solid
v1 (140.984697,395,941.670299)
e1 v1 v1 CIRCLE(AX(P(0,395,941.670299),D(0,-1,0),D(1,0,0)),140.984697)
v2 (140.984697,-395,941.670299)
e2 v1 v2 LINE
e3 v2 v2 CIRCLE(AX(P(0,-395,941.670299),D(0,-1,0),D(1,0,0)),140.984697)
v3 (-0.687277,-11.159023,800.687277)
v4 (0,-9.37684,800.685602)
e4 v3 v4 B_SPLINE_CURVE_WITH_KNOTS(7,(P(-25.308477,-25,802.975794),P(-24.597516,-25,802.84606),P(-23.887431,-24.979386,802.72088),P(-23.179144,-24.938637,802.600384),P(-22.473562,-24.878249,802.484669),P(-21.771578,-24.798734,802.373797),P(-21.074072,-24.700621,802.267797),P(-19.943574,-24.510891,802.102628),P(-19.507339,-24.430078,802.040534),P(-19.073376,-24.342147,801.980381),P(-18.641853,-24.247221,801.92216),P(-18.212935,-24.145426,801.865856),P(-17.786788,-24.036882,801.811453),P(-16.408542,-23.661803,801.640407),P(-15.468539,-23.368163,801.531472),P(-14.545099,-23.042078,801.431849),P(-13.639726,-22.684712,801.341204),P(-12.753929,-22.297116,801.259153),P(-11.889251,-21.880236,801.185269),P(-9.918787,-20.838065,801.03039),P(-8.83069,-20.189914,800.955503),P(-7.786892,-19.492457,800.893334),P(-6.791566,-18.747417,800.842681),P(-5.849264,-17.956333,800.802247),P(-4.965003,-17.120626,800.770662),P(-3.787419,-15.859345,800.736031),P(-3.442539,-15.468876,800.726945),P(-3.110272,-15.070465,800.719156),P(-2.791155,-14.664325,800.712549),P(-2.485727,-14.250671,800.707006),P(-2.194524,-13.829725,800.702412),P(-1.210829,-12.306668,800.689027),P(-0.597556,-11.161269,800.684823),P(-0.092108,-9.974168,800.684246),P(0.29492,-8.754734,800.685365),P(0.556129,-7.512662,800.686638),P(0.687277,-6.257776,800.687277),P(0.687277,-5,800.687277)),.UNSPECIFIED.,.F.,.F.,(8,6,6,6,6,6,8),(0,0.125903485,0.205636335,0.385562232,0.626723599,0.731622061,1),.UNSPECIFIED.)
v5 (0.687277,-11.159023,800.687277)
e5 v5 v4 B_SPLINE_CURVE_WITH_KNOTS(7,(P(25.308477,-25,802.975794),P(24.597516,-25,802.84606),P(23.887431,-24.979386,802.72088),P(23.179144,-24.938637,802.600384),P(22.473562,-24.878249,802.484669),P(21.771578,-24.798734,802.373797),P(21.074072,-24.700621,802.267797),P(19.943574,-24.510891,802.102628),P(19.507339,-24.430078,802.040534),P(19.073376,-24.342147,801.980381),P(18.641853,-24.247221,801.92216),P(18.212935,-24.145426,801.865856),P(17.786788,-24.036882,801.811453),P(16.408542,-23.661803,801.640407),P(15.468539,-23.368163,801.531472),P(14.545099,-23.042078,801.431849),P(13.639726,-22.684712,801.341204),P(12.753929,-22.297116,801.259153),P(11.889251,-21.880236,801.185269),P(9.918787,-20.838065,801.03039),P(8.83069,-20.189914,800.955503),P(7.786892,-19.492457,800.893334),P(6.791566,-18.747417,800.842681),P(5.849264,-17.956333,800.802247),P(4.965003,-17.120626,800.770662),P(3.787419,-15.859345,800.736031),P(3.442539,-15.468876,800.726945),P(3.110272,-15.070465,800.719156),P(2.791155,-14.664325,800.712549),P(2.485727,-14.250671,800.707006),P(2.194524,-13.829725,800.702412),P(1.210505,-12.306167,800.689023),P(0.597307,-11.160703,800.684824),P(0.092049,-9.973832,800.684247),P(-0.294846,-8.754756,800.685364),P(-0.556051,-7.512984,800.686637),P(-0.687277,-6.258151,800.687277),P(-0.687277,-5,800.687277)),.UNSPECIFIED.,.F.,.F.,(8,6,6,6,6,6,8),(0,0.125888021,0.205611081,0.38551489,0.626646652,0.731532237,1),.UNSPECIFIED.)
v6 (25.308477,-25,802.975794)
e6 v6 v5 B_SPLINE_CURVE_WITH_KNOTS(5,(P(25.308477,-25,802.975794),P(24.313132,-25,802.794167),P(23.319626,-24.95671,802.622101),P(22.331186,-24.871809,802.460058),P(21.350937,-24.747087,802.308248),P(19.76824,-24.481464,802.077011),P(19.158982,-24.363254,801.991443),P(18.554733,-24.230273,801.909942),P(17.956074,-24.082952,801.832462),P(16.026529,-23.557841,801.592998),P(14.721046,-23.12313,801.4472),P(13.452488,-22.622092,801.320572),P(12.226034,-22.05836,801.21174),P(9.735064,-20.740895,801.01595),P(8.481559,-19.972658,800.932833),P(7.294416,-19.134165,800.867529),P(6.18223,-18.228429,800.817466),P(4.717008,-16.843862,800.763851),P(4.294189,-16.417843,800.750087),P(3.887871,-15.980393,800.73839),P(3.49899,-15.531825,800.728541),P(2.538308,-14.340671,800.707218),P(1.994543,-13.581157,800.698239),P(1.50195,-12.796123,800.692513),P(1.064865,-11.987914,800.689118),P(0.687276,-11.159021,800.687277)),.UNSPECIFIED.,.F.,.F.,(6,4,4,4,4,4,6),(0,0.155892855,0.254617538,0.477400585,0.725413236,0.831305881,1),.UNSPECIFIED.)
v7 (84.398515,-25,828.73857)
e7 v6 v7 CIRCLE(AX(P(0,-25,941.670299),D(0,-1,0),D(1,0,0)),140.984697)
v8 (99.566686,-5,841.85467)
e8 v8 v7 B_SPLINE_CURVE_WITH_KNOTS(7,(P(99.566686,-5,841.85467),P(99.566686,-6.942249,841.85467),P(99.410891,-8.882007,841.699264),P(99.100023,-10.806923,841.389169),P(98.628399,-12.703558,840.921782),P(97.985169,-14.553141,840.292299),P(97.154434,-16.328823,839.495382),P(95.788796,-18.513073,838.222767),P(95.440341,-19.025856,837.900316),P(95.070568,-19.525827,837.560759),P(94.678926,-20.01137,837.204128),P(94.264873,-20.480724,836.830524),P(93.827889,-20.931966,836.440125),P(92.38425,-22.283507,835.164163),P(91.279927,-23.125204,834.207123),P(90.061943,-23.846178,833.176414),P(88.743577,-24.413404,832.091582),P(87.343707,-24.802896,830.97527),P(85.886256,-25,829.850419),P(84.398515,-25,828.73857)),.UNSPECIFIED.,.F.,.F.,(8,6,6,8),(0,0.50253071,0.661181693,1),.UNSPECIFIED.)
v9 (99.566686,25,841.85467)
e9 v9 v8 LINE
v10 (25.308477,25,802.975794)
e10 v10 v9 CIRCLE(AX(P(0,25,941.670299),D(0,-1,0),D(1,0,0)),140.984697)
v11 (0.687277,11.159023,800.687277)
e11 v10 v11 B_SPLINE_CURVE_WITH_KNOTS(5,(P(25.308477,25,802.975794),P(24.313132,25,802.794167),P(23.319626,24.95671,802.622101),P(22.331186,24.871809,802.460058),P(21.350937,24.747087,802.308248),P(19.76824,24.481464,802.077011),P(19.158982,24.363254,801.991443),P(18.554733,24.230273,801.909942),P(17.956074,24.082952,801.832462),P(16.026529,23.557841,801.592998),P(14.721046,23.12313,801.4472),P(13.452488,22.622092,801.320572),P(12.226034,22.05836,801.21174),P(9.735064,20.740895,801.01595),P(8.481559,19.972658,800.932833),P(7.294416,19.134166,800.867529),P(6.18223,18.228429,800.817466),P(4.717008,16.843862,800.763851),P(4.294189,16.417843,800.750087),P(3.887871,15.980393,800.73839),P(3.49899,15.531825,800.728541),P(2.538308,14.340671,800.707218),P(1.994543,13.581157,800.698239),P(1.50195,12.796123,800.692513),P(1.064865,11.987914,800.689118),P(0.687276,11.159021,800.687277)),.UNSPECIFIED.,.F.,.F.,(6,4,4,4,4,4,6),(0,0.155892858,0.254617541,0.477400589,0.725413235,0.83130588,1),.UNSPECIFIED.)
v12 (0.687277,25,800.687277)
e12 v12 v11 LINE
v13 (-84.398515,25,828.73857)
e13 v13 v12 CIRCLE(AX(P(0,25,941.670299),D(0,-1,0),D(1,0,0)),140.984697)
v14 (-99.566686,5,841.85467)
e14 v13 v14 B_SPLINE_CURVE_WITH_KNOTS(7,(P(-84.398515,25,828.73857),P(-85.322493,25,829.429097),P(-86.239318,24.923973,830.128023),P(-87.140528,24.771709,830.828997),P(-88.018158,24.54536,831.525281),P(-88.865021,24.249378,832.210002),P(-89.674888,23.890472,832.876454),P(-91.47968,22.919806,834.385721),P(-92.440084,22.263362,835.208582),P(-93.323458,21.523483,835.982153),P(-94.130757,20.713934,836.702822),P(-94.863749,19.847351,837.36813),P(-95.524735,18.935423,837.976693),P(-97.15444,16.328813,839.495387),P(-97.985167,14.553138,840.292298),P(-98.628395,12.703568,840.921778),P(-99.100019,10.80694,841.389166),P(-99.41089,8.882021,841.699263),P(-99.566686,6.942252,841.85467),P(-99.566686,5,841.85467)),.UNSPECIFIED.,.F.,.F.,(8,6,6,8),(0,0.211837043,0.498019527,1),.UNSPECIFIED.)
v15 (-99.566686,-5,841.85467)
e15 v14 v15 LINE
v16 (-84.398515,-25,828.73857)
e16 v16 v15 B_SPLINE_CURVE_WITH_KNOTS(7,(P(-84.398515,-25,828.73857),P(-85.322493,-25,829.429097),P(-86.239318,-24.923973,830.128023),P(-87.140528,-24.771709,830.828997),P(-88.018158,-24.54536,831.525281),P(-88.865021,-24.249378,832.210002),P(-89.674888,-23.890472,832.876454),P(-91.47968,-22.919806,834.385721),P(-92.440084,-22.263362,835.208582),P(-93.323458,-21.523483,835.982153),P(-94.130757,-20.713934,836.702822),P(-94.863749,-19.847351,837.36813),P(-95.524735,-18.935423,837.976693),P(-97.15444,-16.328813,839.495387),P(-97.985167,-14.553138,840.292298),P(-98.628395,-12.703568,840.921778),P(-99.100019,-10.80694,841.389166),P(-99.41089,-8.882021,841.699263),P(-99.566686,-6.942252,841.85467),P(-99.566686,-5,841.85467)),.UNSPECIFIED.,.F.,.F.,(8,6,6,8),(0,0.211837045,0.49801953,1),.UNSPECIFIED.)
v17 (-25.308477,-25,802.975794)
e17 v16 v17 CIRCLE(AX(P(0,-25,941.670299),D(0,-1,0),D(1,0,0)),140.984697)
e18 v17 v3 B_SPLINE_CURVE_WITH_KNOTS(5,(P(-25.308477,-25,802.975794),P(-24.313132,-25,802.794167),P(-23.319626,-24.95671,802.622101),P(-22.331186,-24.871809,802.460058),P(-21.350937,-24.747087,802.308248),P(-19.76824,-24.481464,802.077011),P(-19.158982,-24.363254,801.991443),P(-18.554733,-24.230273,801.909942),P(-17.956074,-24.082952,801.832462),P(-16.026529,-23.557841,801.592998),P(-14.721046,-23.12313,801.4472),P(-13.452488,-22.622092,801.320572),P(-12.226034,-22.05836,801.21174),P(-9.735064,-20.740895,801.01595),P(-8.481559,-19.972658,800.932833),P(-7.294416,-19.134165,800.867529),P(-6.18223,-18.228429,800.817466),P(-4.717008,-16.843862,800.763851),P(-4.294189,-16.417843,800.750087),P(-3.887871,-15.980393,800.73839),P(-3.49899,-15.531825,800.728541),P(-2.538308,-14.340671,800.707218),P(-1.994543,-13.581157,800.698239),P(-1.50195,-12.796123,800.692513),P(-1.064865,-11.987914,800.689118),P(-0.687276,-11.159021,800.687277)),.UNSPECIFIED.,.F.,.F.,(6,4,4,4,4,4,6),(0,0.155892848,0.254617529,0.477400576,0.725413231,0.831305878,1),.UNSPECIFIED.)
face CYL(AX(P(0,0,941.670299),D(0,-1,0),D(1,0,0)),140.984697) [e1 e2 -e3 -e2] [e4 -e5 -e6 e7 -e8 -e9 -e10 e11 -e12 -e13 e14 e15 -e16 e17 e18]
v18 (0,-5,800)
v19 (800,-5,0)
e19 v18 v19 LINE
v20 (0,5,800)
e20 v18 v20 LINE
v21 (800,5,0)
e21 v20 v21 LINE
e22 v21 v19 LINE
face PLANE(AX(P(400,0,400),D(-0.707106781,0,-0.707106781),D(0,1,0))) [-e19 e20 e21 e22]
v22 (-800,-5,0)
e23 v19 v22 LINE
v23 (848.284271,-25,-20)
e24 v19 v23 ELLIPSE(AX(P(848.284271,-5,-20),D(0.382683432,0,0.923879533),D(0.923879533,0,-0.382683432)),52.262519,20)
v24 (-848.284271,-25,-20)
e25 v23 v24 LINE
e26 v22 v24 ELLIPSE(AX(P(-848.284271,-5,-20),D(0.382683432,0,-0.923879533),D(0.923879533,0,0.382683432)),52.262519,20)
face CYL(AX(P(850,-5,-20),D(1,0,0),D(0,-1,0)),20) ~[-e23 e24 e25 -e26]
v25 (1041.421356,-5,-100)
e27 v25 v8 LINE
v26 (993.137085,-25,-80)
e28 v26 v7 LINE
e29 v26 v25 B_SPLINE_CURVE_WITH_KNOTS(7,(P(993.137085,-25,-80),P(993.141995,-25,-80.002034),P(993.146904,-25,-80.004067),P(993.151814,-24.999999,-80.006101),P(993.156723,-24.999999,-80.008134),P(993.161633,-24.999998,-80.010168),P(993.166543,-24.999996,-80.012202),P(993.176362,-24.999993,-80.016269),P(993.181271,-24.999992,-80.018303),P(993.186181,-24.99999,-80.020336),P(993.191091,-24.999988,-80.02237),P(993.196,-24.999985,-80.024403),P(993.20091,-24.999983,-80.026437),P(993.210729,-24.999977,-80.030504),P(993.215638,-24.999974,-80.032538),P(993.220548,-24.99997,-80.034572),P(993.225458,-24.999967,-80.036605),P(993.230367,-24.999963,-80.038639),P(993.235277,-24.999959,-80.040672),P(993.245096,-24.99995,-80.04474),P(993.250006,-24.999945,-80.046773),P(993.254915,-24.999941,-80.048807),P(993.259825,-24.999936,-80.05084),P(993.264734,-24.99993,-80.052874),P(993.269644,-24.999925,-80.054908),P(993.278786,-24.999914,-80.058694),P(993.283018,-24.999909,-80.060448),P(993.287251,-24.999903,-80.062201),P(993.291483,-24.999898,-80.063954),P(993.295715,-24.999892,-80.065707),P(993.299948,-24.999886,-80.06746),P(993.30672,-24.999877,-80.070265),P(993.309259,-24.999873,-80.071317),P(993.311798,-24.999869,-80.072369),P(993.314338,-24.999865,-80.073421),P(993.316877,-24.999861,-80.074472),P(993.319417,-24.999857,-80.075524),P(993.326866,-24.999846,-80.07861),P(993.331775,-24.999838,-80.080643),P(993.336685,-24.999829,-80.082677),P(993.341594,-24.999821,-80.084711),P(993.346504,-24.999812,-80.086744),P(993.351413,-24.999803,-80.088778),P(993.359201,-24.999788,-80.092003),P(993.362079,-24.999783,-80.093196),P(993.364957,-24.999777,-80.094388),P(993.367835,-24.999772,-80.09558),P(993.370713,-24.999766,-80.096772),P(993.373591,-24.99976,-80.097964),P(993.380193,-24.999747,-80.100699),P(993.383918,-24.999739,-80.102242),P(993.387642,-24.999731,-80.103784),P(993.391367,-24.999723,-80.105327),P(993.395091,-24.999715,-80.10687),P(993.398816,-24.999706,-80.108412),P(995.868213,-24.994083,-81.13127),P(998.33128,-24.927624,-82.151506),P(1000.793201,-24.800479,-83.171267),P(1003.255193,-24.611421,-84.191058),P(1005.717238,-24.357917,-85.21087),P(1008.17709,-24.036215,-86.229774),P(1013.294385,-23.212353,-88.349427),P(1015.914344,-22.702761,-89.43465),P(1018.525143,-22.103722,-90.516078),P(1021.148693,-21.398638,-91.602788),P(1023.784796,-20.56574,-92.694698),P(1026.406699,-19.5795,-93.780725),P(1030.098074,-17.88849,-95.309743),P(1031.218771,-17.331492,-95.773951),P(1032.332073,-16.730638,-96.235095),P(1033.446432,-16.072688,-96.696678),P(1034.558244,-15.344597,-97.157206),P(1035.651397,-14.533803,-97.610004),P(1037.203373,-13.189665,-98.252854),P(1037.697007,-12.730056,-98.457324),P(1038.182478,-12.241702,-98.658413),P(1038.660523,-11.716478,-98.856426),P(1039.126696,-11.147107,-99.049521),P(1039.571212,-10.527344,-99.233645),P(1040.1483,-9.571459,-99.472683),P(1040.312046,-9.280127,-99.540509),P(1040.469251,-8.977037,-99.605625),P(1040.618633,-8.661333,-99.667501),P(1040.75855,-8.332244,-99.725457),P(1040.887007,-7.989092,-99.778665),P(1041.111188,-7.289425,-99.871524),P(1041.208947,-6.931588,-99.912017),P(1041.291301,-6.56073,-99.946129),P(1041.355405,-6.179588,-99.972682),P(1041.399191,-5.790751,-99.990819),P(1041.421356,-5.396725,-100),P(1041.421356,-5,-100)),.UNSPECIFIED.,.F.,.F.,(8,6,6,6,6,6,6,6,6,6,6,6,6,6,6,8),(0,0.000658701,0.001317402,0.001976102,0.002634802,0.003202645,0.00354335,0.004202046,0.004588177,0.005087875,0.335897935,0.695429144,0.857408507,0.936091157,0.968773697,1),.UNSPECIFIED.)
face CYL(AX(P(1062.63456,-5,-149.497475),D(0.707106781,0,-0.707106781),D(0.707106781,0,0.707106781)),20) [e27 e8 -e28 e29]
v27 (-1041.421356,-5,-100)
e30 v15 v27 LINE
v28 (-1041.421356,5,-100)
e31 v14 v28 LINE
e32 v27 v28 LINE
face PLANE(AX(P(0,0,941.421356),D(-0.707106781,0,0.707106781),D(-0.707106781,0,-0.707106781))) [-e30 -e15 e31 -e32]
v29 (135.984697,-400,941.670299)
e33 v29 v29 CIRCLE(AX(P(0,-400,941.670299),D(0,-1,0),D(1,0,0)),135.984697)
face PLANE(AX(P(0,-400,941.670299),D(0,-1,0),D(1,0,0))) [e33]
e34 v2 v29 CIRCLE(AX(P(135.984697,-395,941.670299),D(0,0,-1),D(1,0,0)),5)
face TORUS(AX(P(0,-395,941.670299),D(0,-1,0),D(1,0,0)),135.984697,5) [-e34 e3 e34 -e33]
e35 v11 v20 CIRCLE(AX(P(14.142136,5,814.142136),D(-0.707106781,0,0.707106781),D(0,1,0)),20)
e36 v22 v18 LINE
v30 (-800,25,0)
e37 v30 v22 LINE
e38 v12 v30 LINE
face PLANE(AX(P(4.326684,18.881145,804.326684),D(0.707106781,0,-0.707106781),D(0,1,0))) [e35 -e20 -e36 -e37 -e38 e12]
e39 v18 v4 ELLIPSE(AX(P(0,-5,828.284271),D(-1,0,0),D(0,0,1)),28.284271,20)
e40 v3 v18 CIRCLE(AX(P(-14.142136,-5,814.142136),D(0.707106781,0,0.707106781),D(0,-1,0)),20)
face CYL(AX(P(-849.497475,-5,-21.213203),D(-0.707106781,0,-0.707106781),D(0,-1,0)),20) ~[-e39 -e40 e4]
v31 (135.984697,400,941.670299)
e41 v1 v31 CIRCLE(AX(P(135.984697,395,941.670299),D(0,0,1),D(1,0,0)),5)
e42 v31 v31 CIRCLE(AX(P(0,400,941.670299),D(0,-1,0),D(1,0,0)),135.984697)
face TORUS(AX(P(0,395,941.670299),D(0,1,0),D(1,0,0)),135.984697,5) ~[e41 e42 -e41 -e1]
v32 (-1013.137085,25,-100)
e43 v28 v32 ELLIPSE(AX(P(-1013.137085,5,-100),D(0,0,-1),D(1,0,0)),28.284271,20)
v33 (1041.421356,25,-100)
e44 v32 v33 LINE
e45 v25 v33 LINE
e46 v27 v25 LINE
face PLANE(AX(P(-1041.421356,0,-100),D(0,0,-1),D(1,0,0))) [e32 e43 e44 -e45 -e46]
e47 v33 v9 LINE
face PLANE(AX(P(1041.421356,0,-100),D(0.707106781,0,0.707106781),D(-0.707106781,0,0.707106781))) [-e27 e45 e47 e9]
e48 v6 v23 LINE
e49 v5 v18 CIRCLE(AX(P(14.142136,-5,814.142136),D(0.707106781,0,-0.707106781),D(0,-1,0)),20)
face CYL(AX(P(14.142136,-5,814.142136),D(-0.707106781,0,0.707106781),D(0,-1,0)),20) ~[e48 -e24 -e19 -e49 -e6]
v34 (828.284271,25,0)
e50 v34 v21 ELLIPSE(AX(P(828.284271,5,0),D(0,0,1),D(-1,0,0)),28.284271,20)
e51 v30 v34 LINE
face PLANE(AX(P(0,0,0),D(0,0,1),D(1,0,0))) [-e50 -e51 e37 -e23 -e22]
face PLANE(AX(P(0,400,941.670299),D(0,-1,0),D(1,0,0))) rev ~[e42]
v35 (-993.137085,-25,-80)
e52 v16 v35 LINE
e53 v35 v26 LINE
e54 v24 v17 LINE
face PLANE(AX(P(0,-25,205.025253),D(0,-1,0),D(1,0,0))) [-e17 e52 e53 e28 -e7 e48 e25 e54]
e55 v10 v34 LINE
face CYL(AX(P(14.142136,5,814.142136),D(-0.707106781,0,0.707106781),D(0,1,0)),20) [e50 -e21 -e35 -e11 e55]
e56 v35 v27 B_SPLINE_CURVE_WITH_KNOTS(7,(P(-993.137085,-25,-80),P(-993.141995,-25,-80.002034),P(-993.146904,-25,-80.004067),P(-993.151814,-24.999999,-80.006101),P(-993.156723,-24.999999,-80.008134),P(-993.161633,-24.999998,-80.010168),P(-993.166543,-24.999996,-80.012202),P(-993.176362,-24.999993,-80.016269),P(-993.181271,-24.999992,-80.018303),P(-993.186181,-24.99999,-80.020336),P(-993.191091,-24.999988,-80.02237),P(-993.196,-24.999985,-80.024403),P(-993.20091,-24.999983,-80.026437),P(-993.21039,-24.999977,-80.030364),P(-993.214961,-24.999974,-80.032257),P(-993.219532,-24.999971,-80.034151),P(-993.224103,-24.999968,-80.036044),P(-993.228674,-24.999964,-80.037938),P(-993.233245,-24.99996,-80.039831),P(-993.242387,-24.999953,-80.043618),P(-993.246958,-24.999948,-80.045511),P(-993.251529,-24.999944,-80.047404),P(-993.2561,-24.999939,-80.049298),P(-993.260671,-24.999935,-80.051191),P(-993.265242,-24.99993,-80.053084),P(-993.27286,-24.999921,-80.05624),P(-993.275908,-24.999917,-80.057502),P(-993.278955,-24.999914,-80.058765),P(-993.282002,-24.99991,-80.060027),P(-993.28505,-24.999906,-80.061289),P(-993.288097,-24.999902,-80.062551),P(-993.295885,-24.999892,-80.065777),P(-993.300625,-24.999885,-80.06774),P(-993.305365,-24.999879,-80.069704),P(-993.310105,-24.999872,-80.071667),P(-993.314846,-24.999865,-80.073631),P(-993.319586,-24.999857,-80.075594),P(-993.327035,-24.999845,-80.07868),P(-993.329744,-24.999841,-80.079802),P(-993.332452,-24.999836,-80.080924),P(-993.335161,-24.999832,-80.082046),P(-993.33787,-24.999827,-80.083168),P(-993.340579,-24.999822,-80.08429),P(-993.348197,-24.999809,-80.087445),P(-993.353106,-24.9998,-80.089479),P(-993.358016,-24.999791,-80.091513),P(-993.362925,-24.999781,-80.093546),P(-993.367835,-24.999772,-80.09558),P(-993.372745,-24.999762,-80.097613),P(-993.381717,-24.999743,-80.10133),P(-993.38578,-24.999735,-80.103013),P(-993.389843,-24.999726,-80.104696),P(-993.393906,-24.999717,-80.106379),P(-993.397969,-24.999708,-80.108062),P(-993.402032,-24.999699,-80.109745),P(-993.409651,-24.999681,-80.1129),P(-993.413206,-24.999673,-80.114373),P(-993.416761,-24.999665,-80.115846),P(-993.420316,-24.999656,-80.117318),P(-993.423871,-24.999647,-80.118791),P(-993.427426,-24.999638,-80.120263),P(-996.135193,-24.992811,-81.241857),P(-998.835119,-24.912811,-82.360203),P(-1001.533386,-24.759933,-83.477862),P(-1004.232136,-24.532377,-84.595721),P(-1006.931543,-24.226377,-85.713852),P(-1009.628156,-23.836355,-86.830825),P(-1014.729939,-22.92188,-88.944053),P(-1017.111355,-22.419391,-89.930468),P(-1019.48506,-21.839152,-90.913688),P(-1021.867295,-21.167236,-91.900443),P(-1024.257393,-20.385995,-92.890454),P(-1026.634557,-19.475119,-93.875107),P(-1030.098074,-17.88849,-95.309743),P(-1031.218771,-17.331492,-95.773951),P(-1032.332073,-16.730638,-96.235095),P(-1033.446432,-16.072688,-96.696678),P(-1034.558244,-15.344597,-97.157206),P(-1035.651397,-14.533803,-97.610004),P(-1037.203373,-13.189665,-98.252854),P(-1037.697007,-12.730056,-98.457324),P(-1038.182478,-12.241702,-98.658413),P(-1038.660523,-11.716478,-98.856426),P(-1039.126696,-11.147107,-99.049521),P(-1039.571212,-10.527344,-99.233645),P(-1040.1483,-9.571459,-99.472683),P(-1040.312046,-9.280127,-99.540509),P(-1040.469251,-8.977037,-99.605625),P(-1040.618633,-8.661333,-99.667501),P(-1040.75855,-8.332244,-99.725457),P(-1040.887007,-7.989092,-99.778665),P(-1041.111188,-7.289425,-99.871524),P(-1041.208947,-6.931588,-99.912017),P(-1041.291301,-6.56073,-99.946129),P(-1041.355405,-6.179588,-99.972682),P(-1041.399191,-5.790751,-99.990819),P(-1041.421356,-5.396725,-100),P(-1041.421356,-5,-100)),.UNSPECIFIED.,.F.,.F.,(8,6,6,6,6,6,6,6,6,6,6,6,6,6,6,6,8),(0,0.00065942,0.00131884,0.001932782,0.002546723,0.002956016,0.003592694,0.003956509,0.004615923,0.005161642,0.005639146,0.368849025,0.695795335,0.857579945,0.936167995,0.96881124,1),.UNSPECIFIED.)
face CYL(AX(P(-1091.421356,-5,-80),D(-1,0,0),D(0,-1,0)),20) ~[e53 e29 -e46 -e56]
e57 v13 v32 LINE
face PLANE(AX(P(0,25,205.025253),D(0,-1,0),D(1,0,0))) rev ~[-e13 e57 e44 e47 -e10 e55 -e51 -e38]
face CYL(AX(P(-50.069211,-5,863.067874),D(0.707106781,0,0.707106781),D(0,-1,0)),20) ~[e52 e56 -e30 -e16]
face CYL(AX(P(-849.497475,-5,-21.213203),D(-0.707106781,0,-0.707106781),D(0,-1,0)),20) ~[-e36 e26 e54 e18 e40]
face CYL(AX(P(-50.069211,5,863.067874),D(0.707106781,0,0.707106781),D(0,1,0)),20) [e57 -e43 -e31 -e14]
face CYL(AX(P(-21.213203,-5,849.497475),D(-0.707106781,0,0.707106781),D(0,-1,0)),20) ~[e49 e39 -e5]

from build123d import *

# Parameters (mm, degrees)
F1_R         = 140.9846966486
F2_DEPTH     = 400
F3_DEPTH     = 25
F4_T1_DEPTH  = 2182.8427124746
F4_T6_DEPTH  = 1431.9836481951
F4_S7_R      = 140.9846966486
F4_T8_DEPTH  = 728
F4_T12_DEPTH = 1181.3708498985
F4_S13_R     = 140.9846966486
F4_T14_DEPTH = 602
F4_T19_DEPTH = 1431.9836481951
F4_S20_R     = 140.9846966486
F4_T21_DEPTH = 728
F4_T25_DEPTH = 1700
F4_T31_DEPTH = 1181.3708498985
F4_S32_R     = 140.9846966486
F4_T33_DEPTH = 602
F4_T38_DEPTH = 1181.3708498985
F4_S39_R     = 140.9846966486
F4_T40_DEPTH = 602
F4_T45_DEPTH = 1431.9836481951
F4_S46_R     = 140.9846966486
F4_T47_DEPTH = 728
F4_T52_DEPTH = 1700
F4_T56_DEPTH = 1181.3708498985
F4_T63_DEPTH = 1231.3708498985
F4_S64_R     = 140.9846966486
F4_T65_DEPTH = 627
F4_T69_DEPTH = 1231.3708498985
F4_S70_R     = 140.9846966486
F4_T71_DEPTH = 627
F4_T78_DEPTH = 1700
F4_T82_DEPTH = 1181.3708498985
F5_R         = 5


# Not quite as in the source:
# - a fillet or chamfer that OpenCascade refuses, or shapes differently, is made with other operations: its cross-section is extruded or revolved along the edge and cut away or added


with BuildPart() as f2:
    # F1 (on face) → F2 (new body, symmetric)
    with BuildSketch(Plane.XZ):
        with Locations((0, 941.6702985764)):
            Circle(F1_R)
    extrude(amount=F2_DEPTH, both=True)

    # F0 (on Front) → F3 (join, symmetric)
    with BuildSketch(Plane.XZ):
        Polygon((0, -100), (1041.4213562373, -100), (0, 941.4213562373), (-1041.4213562373, -100), align=None)
        Polygon((800, 0), (0, 0), (-800, 0), (0, 800), align=None, mode=Mode.SUBTRACT)
    extrude(amount=F3_DEPTH, both=True)

    # F4: fillet of radius 20 on 8 edges, made by hand

    # F4_s2 → F4_t1 (cut)
    with BuildSketch(Plane.YZ.offset(-1091.4213562373)):
        with BuildLine():
            ThreePointArc((-25, -80), (-19.1421356237, -94.1421356237), (-5, -100))
            Line((-5, -100), (-25, -100))
            Line((-25, -100), (-25, -80))
        make_face()
    extrude(amount=F4_T1_DEPTH, mode=Mode.SUBTRACT)


with BuildPart() as f4_tool4:
    # F4_s5 → F4_t6 (new body)
    with BuildSketch(Plane(origin=(406.4993310091, 0, 406.4993310091), x_dir=(0, 1, 0), z_dir=(-0.7071067812, 0, -0.7071067812))):
        with BuildLine():
            ThreePointArc((-25, -645.6854249492), (-19.1421356237, -659.827560573), (-5, -665.6854249492))
            Line((-5, -665.6854249492), (-25, -665.6854249492))
            Line((-25, -665.6854249492), (-25, -645.6854249492))
        make_face()
    extrude(amount=F4_T6_DEPTH)

    # F4_s7 → F4_t8 (cut, symmetric)
    with BuildSketch(Plane.XZ.offset(15)):
        with Locations((0, 941.6702985764)):
            Circle(F4_S7_R)
    extrude(amount=F4_T8_DEPTH, both=True, mode=Mode.SUBTRACT)


with BuildPart() as f2_1:
    add(f2.part)

    # F4_t3: cut F4_tool4
    add(f4_tool4.part, mode=Mode.SUBTRACT)


with BuildPart() as f4_tool10:
    # F4_s11 → F4_t12 (new body)
    with BuildSketch(Plane(origin=(-435.3553390593, 0, -435.3553390593), x_dir=(0, 1, 0), z_dir=(0.7071067812, 0, 0.7071067812))):
        with BuildLine():
            ThreePointArc((-25, 585.6854249492), (-19.1421356237, 571.5432893255), (-5, 565.6854249492))
            Line((-5, 565.6854249492), (-25, 565.6854249492))
            Line((-25, 565.6854249492), (-25, 585.6854249492))
        make_face()
    extrude(amount=F4_T12_DEPTH)

    # F4_s13 → F4_t14 (cut, symmetric)
    with BuildSketch(Plane.XZ.offset(15)):
        with Locations((0, 941.6702985764)):
            Circle(F4_S13_R)
    extrude(amount=F4_T14_DEPTH, both=True, mode=Mode.SUBTRACT)

    split(bisect_by=Plane.XY, keep=Keep.TOP)


with BuildPart() as f2_2:
    add(f2_1.part)

    # F4_t9: cut F4_tool10
    add(f4_tool10.part, mode=Mode.SUBTRACT)


with BuildPart() as f4_tool17:
    # F4_s18 → F4_t19 (new body)
    with BuildSketch(Plane(origin=(406.4993310091, 0, 406.4993310091), x_dir=(0, 1, 0), z_dir=(-0.7071067812, 0, -0.7071067812))):
        with BuildLine():
            ThreePointArc((25, -645.6854249492), (19.1421356237, -659.827560573), (5, -665.6854249492))
            Line((5, -665.6854249492), (25, -665.6854249492))
            Line((25, -665.6854249492), (25, -645.6854249492))
        make_face()
    extrude(amount=F4_T19_DEPTH)

    # F4_s20 → F4_t21 (cut, symmetric)
    with BuildSketch(Plane.XZ.offset(-15)):
        with Locations((0, 941.6702985764)):
            Circle(F4_S20_R)
    extrude(amount=F4_T21_DEPTH, both=True, mode=Mode.SUBTRACT)


with BuildPart() as f2_3:
    add(f2_2.part)

    # F4_t16: cut F4_tool17
    add(f4_tool17.part, mode=Mode.SUBTRACT)


with BuildPart() as f4_tool23:
    # F4_s24 → F4_t25 (new body)
    with BuildSketch(Plane.YZ.offset(850)):
        with BuildLine():
            ThreePointArc((-25, -20), (-19.1421356237, -5.8578643763), (-5, 0))
            Line((-5, 0), (-25, 0))
            Line((-25, 0), (-25, -20))
        make_face()
    extrude(amount=-F4_T25_DEPTH)

    split(bisect_by=Plane(origin=(-400, 0, 400), x_dir=(0, 1, 0), z_dir=(0.7071067812, 0, -0.7071067812)), keep=Keep.TOP)

    split(bisect_by=Plane(origin=(400, 0, 400), x_dir=(0, 1, 0), z_dir=(-0.7071067812, 0, -0.7071067812)), keep=Keep.TOP)


with BuildPart() as f2_4:
    add(f2_3.part)

    # F4_t22: cut F4_tool23
    add(f4_tool23.part, mode=Mode.SUBTRACT)


with BuildPart() as f4_tool29:
    # F4_s30 → F4_t31 (new body)
    with BuildSketch(Plane(origin=(-400, 0, 400), x_dir=(0, 1, 0), z_dir=(0.7071067812, 0, -0.7071067812))):
        with BuildLine():
            ThreePointArc((-25, 585.6854249492), (-19.1421356237, 571.5432893255), (-5, 565.6854249492))
            Line((-5, 565.6854249492), (-25, 565.6854249492))
            Line((-25, 565.6854249492), (-25, 585.6854249492))
        make_face()
    extrude(amount=F4_T31_DEPTH)

    # F4_s32 → F4_t33 (cut, symmetric)
    with BuildSketch(Plane.XZ.offset(15)):
        with Locations((0, 941.6702985764)):
            Circle(F4_S32_R)
    extrude(amount=F4_T33_DEPTH, both=True, mode=Mode.SUBTRACT)

    split(bisect_by=Plane.XY, keep=Keep.TOP)


with BuildPart() as f2_5:
    add(f2_4.part)

    # F4_t28: cut F4_tool29
    add(f4_tool29.part, mode=Mode.SUBTRACT)


with BuildPart() as f4_tool36:
    # F4_s37 → F4_t38 (new body)
    with BuildSketch(Plane(origin=(-400, 0, 400), x_dir=(0, 1, 0), z_dir=(0.7071067812, 0, -0.7071067812))):
        with BuildLine():
            ThreePointArc((25, 585.6854249492), (19.1421356237, 571.5432893255), (5, 565.6854249492))
            Line((5, 565.6854249492), (25, 565.6854249492))
            Line((25, 565.6854249492), (25, 585.6854249492))
        make_face()
    extrude(amount=F4_T38_DEPTH)

    # F4_s39 → F4_t40 (cut, symmetric)
    with BuildSketch(Plane.XZ.offset(-15)):
        with Locations((0, 941.6702985764)):
            Circle(F4_S39_R)
    extrude(amount=F4_T40_DEPTH, both=True, mode=Mode.SUBTRACT)

    split(bisect_by=Plane.XY, keep=Keep.TOP)


with BuildPart() as f2_6:
    add(f2_5.part)

    # F4_t35: cut F4_tool36
    add(f4_tool36.part, mode=Mode.SUBTRACT)


with BuildPart() as f4_tool43:
    # F4_s44 → F4_t45 (new body)
    with BuildSketch(Plane(origin=(606.066017178, 0, -606.066017178), x_dir=(0, 1, 0), z_dir=(-0.7071067812, 0, 0.7071067812))):
        with BuildLine():
            ThreePointArc((-5, -665.6854249492), (-19.1421356237, -659.827560573), (-25, -645.6854249492))
            Line((-25, -645.6854249492), (-25, -665.6854249492))
            Line((-25, -665.6854249492), (-5, -665.6854249492))
        make_face()
    extrude(amount=F4_T45_DEPTH)

    # F4_s46 → F4_t47 (cut, symmetric)
    with BuildSketch(Plane.XZ.offset(15)):
        with Locations((0, 941.6702985764)):
            Circle(F4_S46_R)
    extrude(amount=F4_T47_DEPTH, both=True, mode=Mode.SUBTRACT)


with BuildPart() as f2_7:
    add(f2_6.part)

    # F4_t42: cut F4_tool43
    add(f4_tool43.part, mode=Mode.SUBTRACT)


with BuildPart() as f4_tool50:
    # F4_s51 → F4_t52 (new body)
    with BuildSketch(Plane.YZ.offset(850)):
        with BuildLine():
            ThreePointArc((-25, -20), (-19.1421356237, -5.8578643763), (-5, 0))
            Line((-5, 0), (-25, 0))
            Line((-25, 0), (-25, -20))
        make_face()
    extrude(amount=-F4_T52_DEPTH)

    split(bisect_by=Plane(origin=(-400, 0, 400), x_dir=(0, 1, 0), z_dir=(-0.7071067812, 0, 0.7071067812)), keep=Keep.TOP)


with BuildPart() as f4_tool54:
    # F4_s55 → F4_t56 (new body)
    with BuildSketch(Plane(origin=(-435.3553390593, 0, -435.3553390593), x_dir=(0, 1, 0), z_dir=(0.7071067812, 0, 0.7071067812))):
        with BuildLine():
            ThreePointArc((-25, 585.6854249492), (-19.1421356237, 571.5432893255), (-5, 565.6854249492))
            Line((-5, 565.6854249492), (-25, 565.6854249492))
            Line((-25, 565.6854249492), (-25, 585.6854249492))
        make_face()
    extrude(amount=F4_T56_DEPTH)

    split(bisect_by=Plane.XY, keep=Keep.BOTTOM)


with BuildPart() as f4_tool50_1:
    add(f4_tool50.part)

    # F4_t58: intersect F4_tool54
    add(f4_tool54.part, mode=Mode.INTERSECT)


with BuildPart() as f2_8:
    add(f2_7.part)

    # F4_t48: cut F4_tool50
    add(f4_tool50_1.part, mode=Mode.SUBTRACT)


with BuildPart() as f4_tool61:
    # F4_s62 → F4_t63 (new body)
    with BuildSketch(Plane(origin=(-435.3553390593, 0, 435.3553390593), x_dir=(0, 1, 0), z_dir=(0.7071067812, 0, -0.7071067812))):
        with BuildLine():
            ThreePointArc((-25, 585.6854249492), (-19.1421356237, 571.5432893255), (-5, 565.6854249492))
            Line((-5, 565.6854249492), (-25, 565.6854249492))
            Line((-25, 565.6854249492), (-25, 585.6854249492))
        make_face()
    extrude(amount=F4_T63_DEPTH)

    # F4_s64 → F4_t65 (cut, symmetric)
    with BuildSketch(Plane.XZ.offset(15)):
        with Locations((0, 941.6702985764)):
            Circle(F4_S64_R)
    extrude(amount=F4_T65_DEPTH, both=True, mode=Mode.SUBTRACT)

    split(bisect_by=Plane(origin=(-400, 0, 400), x_dir=(0, 1, 0), z_dir=(-0.7071067812, 0, 0.7071067812)), keep=Keep.TOP)


with BuildPart() as f4_tool67:
    # F4_s68 → F4_t69 (new body)
    with BuildSketch(Plane(origin=(-435.3553390593, 0, -435.3553390593), x_dir=(0, 1, 0), z_dir=(0.7071067812, 0, 0.7071067812))):
        with BuildLine():
            ThreePointArc((-25, 585.6854249492), (-19.1421356237, 571.5432893255), (-5, 565.6854249492))
            Line((-5, 565.6854249492), (-25, 565.6854249492))
            Line((-25, 565.6854249492), (-25, 585.6854249492))
        make_face()
    extrude(amount=F4_T69_DEPTH)

    # F4_s70 → F4_t71 (cut, symmetric)
    with BuildSketch(Plane.XZ.offset(15)):
        with Locations((0, 941.6702985764)):
            Circle(F4_S70_R)
    extrude(amount=F4_T71_DEPTH, both=True, mode=Mode.SUBTRACT)

    split(bisect_by=Plane(origin=(400, 0, 400), x_dir=(0, 1, 0), z_dir=(0.7071067812, 0, 0.7071067812)), keep=Keep.TOP)


with BuildPart() as f4_tool61_1:
    add(f4_tool61.part)

    # F4_t73: intersect F4_tool67
    add(f4_tool67.part, mode=Mode.INTERSECT)


with BuildPart() as f2_9:
    add(f2_8.part)

    # F4_t59: cut F4_tool61
    add(f4_tool61_1.part, mode=Mode.SUBTRACT)


with BuildPart() as f4_tool76:
    # F4_s77 → F4_t78 (new body)
    with BuildSketch(Plane.YZ.offset(850)):
        with BuildLine():
            ThreePointArc((-25, -20), (-19.1421356237, -5.8578643763), (-5, 0))
            Line((-5, 0), (-25, 0))
            Line((-25, 0), (-25, -20))
        make_face()
    extrude(amount=-F4_T78_DEPTH)

    split(bisect_by=Plane(origin=(400, 0, 400), x_dir=(0, 1, 0), z_dir=(0.7071067812, 0, 0.7071067812)), keep=Keep.TOP)


with BuildPart() as f4_tool80:
    # F4_s81 → F4_t82 (new body)
    with BuildSketch(Plane(origin=(-400, 0, 400), x_dir=(0, 1, 0), z_dir=(0.7071067812, 0, -0.7071067812))):
        with BuildLine():
            ThreePointArc((-25, 585.6854249492), (-19.1421356237, 571.5432893255), (-5, 565.6854249492))
            Line((-5, 565.6854249492), (-25, 565.6854249492))
            Line((-25, 565.6854249492), (-25, 585.6854249492))
        make_face()
    extrude(amount=F4_T82_DEPTH)

    split(bisect_by=Plane.XY, keep=Keep.BOTTOM)


with BuildPart() as f4_tool76_1:
    add(f4_tool76.part)

    # F4_t84: intersect F4_tool80
    add(f4_tool80.part, mode=Mode.INTERSECT)


with BuildPart() as f2_10:
    add(f2_9.part)

    # F4_t74: cut F4_tool76
    add(f4_tool76_1.part, mode=Mode.SUBTRACT)

    # F5
    f5_edges = [f2_10.edges().sort_by_distance(p)[0] for p in [
        (-140.984697, 400, 941.670299),
        (-140.984697, -400, 941.670299),
    ]]
    fillet(f5_edges, radius=F5_R)


solid = f2_10.part
